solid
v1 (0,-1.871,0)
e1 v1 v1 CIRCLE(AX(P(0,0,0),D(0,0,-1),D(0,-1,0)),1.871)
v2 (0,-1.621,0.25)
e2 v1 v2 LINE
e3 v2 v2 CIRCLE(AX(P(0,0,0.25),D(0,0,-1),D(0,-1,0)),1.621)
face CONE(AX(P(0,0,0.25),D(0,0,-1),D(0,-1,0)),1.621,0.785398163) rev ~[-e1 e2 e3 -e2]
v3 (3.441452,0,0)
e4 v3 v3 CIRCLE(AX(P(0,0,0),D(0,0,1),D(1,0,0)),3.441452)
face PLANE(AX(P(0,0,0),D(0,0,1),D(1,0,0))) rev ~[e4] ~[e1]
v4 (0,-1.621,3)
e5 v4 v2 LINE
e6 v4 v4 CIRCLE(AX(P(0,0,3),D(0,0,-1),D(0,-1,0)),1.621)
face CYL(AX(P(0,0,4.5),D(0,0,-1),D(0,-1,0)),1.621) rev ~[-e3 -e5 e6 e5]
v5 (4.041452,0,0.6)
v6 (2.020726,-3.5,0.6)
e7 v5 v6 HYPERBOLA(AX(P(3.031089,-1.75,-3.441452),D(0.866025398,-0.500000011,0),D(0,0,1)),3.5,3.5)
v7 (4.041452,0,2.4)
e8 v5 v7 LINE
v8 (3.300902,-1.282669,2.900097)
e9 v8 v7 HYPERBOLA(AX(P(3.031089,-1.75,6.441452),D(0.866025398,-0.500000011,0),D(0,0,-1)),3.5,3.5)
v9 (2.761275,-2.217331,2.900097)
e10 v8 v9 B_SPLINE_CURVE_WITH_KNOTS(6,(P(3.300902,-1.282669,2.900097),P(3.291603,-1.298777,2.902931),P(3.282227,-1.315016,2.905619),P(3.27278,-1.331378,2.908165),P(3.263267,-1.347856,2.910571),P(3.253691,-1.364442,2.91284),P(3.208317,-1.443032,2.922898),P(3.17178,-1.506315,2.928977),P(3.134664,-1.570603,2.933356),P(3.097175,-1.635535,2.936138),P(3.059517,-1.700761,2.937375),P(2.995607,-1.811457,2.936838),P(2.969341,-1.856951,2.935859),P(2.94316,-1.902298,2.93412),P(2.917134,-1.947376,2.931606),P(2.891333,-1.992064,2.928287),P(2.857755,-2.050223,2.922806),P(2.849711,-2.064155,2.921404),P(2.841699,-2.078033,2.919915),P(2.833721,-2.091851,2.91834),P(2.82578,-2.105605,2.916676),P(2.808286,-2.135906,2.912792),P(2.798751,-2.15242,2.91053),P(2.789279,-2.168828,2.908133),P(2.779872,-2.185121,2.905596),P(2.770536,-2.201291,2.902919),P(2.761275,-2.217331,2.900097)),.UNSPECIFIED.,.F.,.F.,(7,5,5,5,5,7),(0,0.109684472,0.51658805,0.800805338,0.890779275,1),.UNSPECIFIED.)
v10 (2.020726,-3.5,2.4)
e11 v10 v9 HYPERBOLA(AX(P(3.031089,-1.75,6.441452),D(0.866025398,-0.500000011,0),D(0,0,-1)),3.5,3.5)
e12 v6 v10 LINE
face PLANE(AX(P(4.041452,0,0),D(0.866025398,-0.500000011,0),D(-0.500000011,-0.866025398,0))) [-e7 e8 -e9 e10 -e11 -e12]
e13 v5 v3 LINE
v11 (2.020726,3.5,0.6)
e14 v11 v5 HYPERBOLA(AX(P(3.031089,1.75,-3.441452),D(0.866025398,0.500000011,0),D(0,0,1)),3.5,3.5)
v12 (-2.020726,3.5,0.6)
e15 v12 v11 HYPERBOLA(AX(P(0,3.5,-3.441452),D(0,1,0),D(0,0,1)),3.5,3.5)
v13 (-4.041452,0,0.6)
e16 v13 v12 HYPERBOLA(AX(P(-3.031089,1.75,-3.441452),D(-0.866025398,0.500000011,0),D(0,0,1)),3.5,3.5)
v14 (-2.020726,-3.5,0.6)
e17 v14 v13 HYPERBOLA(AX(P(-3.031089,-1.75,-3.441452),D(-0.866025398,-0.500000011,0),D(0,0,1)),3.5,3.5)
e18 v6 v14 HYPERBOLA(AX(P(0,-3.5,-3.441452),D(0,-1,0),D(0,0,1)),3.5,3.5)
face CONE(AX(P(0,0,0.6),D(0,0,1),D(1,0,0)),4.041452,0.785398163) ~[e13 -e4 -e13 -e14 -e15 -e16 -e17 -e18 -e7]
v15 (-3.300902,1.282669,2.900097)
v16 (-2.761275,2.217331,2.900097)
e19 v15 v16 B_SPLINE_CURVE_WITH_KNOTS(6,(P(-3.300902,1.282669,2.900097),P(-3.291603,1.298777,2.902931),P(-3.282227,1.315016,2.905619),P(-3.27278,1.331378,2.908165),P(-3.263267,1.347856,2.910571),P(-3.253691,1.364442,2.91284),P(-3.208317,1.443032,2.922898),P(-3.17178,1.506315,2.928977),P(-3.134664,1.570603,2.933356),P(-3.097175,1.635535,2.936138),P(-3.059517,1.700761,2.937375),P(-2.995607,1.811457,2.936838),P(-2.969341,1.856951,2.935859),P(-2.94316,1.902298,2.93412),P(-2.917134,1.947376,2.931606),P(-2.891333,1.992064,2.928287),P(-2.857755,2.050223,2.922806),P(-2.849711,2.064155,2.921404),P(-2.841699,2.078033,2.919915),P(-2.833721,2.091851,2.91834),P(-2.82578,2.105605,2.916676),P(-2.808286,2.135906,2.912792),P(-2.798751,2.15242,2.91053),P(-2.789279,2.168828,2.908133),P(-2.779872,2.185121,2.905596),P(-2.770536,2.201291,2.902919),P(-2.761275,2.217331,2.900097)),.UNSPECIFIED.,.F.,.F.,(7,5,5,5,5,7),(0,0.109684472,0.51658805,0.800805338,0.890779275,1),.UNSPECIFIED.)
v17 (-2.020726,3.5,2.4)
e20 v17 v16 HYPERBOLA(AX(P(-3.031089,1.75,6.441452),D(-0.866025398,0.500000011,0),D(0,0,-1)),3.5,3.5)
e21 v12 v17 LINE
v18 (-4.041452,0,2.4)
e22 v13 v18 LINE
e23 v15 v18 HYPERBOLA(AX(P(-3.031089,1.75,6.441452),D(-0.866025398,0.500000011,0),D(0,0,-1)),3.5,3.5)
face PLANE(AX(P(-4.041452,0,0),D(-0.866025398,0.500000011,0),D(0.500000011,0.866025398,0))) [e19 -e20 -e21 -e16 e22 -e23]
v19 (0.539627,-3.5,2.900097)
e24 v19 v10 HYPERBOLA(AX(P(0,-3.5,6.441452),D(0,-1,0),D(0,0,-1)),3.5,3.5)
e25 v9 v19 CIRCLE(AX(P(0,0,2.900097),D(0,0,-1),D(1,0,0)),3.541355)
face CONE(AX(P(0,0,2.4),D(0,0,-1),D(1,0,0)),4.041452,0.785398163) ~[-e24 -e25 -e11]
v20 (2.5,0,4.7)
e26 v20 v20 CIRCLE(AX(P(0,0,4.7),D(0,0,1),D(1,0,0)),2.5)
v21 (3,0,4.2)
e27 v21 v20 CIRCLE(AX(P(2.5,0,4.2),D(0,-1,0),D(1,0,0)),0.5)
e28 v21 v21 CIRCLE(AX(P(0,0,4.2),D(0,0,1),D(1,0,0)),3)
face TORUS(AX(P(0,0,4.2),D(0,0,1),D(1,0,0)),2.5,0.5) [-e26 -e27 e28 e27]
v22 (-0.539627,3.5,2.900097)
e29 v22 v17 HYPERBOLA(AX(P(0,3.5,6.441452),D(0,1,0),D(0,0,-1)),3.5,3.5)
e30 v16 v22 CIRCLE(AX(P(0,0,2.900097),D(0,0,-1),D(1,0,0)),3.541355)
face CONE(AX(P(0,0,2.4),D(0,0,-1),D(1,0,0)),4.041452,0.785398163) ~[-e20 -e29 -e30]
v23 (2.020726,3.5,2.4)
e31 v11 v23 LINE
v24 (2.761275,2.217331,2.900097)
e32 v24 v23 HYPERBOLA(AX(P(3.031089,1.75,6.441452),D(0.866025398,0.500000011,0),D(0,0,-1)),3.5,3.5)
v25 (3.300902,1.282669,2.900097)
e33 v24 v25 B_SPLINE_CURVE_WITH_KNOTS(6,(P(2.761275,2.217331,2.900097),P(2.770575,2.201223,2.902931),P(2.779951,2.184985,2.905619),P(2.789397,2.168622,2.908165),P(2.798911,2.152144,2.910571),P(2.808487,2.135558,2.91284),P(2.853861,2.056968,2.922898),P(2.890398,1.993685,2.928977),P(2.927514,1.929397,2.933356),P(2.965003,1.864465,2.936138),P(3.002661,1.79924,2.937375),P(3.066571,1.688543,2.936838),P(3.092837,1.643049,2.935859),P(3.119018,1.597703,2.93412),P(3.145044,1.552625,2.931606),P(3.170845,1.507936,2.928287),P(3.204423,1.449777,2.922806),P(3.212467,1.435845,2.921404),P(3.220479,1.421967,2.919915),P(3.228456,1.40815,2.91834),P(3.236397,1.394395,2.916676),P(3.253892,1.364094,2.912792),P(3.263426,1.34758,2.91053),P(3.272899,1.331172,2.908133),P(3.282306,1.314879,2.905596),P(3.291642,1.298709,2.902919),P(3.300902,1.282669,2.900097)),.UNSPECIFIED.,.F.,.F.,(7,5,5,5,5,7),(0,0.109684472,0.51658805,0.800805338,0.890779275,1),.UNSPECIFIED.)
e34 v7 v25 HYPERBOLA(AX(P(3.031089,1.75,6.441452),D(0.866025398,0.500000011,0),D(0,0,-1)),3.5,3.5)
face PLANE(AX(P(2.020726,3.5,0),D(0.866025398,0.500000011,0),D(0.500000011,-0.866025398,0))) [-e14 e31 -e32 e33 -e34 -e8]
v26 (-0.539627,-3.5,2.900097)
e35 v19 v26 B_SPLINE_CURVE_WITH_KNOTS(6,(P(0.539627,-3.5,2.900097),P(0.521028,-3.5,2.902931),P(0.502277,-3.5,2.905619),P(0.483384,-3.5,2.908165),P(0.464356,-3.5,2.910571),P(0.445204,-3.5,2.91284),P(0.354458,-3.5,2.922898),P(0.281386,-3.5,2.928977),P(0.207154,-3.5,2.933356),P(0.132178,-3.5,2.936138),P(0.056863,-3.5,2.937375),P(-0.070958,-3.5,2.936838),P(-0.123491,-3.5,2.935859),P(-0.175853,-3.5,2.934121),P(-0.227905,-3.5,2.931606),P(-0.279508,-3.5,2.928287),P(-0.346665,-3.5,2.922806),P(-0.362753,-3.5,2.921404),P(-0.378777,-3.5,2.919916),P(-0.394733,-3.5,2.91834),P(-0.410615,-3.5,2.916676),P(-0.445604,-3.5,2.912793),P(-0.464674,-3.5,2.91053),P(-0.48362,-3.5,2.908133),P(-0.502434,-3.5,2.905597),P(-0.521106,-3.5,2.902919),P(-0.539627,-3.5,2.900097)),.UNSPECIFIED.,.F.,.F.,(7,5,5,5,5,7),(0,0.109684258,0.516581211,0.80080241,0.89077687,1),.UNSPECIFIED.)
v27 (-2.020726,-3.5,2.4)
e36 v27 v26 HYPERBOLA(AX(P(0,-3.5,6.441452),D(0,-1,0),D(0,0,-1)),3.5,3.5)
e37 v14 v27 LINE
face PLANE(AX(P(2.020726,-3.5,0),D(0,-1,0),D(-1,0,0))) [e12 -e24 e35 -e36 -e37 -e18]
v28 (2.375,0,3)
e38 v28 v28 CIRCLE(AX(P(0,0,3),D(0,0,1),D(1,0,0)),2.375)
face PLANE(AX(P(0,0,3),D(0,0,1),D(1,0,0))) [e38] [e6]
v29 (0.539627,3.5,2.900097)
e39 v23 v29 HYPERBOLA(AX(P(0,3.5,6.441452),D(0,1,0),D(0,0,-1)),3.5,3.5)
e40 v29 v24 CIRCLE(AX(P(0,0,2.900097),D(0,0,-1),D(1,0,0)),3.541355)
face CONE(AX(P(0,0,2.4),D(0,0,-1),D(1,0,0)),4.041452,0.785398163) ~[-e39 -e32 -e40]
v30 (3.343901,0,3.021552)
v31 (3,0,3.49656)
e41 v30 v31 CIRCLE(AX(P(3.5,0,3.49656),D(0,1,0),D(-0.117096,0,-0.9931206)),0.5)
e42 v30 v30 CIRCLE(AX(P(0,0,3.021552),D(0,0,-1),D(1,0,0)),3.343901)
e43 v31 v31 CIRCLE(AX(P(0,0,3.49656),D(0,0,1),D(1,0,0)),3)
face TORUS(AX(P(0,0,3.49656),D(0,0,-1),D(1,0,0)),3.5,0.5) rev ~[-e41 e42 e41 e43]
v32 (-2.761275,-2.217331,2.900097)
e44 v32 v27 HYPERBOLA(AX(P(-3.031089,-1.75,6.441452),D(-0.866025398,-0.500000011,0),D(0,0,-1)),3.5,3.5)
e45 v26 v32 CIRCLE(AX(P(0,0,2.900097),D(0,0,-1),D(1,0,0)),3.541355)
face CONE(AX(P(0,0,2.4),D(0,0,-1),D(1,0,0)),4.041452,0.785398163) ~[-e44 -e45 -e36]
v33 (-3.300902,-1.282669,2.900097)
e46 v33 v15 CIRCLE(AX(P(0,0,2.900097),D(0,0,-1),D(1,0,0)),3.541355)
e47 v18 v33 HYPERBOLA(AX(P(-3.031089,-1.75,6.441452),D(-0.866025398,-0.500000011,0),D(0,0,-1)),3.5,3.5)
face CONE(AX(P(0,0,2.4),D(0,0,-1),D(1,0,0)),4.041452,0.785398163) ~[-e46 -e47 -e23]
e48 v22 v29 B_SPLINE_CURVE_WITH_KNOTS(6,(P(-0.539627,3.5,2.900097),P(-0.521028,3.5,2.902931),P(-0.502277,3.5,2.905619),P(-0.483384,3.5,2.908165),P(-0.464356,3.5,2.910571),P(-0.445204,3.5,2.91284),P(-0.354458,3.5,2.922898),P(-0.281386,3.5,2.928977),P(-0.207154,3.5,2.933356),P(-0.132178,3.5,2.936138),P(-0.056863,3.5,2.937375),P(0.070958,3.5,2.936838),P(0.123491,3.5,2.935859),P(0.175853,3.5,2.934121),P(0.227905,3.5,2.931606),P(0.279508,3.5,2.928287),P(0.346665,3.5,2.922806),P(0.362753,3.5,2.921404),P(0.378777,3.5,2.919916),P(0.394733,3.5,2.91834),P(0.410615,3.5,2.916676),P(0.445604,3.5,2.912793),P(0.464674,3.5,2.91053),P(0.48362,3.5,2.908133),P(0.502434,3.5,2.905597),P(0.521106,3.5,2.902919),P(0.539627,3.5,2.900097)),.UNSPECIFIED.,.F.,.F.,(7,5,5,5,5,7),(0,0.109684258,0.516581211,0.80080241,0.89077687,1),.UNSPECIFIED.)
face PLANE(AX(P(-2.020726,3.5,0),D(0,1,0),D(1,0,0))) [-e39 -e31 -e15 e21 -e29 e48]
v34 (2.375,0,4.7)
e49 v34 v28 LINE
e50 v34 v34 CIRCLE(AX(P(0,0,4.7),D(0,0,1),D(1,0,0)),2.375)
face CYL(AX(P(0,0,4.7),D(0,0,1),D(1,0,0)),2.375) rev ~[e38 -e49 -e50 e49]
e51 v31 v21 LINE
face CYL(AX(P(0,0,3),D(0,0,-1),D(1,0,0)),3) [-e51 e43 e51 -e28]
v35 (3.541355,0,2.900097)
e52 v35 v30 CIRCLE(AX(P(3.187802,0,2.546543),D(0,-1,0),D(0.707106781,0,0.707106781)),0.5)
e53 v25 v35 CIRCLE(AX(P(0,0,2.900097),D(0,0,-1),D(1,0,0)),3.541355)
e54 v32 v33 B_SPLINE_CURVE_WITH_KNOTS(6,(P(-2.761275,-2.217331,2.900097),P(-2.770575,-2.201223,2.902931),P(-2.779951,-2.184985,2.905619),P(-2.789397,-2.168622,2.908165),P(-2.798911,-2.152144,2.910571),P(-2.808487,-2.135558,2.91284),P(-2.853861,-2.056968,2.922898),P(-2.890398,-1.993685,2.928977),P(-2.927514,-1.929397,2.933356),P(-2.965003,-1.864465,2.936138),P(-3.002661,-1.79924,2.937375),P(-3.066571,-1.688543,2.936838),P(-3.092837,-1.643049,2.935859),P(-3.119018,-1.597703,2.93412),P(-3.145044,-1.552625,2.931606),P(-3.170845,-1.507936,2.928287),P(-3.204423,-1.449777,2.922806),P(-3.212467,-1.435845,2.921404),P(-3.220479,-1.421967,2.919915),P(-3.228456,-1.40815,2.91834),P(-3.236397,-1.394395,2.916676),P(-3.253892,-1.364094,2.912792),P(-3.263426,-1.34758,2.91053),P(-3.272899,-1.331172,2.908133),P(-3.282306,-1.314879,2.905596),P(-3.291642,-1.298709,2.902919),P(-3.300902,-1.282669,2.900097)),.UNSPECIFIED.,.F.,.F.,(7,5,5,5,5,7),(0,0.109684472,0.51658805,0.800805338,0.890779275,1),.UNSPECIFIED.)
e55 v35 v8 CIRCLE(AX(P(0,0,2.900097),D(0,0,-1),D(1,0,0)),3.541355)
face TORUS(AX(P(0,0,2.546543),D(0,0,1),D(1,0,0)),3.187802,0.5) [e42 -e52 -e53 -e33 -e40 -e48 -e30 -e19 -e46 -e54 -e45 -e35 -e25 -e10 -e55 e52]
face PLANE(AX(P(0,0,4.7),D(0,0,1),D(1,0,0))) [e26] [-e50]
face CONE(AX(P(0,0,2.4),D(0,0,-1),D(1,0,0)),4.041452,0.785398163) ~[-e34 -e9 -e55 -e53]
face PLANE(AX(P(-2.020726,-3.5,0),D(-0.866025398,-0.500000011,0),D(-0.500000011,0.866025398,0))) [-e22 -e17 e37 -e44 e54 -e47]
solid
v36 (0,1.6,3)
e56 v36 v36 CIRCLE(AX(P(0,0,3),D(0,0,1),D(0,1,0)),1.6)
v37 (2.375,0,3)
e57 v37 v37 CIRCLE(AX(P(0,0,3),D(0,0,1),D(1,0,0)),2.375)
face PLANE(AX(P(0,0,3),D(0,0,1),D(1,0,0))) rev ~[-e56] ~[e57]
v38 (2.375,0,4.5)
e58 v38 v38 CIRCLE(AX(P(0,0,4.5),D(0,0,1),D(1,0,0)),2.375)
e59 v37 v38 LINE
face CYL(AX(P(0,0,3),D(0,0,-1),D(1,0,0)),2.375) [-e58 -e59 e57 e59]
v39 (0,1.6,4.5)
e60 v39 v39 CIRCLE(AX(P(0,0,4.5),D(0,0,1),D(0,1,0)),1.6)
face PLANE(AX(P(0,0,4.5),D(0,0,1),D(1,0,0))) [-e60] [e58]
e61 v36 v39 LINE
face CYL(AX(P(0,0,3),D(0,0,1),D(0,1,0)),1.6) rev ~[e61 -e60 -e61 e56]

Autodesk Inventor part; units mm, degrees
ref_plane "YZ Plane" through (0, 0, 0) normal (1, 0, 0) x (0, 1, 0)
ref_plane "XZ Plane" through (0, 0, 0) normal (0, 1, 0) x (-1, 0, 0)
ref_plane "XY Plane" through (0, 0, 0) normal (0, 0, 1) x (1, 0, 0)
sketch "Sketch1" plane through (0, 0, 0) normal (0, 0, 1) x (1, 0, 0)
  circle A0 centre (0, 0) radius 4.041452
  line L0 (-2.020726, 3.5) -> (2.020726, 3.5)
  line L1 (2.020726, 3.5) -> (4.041452, 0)
  line L2 (4.041452, 0) -> (2.020726, -3.5)
  line L3 (2.020726, -3.5) -> (-2.020726, -3.5)
  line L4 (-2.020726, -3.5) -> (-4.041452, 0)
  line L5 (-4.041452, 0) -> (-2.020726, 3.5)
  point P0 (-4.041452, 0)
  point P1 (-4.041452, 0)
  point P2 (4.041452, 0)
  point P3 (4.041452, 0)
  dimension "d0" = 7
extrude "Extrusion1" add sketch "Sketch1" along normal blind 3
chamfer "Chamfer1" distance 0.6 angle 45 2 edges at (-4.0415, 0, 0) (-4.0415, 0, 3)
extrude "Extrusion2" cut sketch "Sketch1" along normal through all contours L1 A0 | A0 L2 | L0 A0 | A0 L3 | L5 A0 | A0 L4
sketch "Sketch2" plane through (0, 0, 3) normal (0, 0, 1) x (1, 0, 0)
  circle A0 centre (0, 0) radius 3.441452
  circle A1 centre (0, 0) radius 3
  dimension "d9" = 6
extrude "Extrusion3" add sketch "Sketch2" along normal blind 1.7 contours A1
fillet "Fillet1" radius 0.5 3 edges at (-3, 0, 3) (-3.4415, 0, 3) (-3, 0, 4.7)
sketch "Sketch3" plane through (0, 0, 4.7) normal (0, 0, 1) x (1, 0, 0)
  circle A0 centre (0, 0) radius 2.375
  dimension "d13" = 4.75
extrude "Extrusion4" cut sketch "Sketch3" against normal blind 1.7
sketch "Sketch4" plane through (0, 0, 3) normal (0, 0, 1) x (1, 0, 0)
  circle A0 centre (0, 0) radius 2.375 projected
extrude "Extrusion5" add sketch "Sketch4" along normal blind 1.5 separate body
sketch "Sketch5" plane through (0, 0, 4.5) normal (0, 0, 1) x (1, 0, 0)
  circle A0 centre (0, 0) radius 2.375 projected
hole "Hole1" at (0, 0, 4.5) direction (0, 0, -1) diameter 3.242 end through all bodies 1 thread size "M4x0.7" class "6H" standard "ANSI Metric M Profile"
sketch "Sketch6" plane through (0, 0, 3) normal (0, 0, -1) x (-1, 0, 0)
  circle A0 centre (0, 0) radius 1.621 projected
hole "Hole2" at (0, 0, 3) direction (0, 0, 1) diameter 3.2 end through all bodies 2
chamfer "Chamfer2" distance 0.25 angle 45 1 edges at (0, 1.621, 0)
properties part number "M4 LOCKNUT" material "Stainless Steel"
